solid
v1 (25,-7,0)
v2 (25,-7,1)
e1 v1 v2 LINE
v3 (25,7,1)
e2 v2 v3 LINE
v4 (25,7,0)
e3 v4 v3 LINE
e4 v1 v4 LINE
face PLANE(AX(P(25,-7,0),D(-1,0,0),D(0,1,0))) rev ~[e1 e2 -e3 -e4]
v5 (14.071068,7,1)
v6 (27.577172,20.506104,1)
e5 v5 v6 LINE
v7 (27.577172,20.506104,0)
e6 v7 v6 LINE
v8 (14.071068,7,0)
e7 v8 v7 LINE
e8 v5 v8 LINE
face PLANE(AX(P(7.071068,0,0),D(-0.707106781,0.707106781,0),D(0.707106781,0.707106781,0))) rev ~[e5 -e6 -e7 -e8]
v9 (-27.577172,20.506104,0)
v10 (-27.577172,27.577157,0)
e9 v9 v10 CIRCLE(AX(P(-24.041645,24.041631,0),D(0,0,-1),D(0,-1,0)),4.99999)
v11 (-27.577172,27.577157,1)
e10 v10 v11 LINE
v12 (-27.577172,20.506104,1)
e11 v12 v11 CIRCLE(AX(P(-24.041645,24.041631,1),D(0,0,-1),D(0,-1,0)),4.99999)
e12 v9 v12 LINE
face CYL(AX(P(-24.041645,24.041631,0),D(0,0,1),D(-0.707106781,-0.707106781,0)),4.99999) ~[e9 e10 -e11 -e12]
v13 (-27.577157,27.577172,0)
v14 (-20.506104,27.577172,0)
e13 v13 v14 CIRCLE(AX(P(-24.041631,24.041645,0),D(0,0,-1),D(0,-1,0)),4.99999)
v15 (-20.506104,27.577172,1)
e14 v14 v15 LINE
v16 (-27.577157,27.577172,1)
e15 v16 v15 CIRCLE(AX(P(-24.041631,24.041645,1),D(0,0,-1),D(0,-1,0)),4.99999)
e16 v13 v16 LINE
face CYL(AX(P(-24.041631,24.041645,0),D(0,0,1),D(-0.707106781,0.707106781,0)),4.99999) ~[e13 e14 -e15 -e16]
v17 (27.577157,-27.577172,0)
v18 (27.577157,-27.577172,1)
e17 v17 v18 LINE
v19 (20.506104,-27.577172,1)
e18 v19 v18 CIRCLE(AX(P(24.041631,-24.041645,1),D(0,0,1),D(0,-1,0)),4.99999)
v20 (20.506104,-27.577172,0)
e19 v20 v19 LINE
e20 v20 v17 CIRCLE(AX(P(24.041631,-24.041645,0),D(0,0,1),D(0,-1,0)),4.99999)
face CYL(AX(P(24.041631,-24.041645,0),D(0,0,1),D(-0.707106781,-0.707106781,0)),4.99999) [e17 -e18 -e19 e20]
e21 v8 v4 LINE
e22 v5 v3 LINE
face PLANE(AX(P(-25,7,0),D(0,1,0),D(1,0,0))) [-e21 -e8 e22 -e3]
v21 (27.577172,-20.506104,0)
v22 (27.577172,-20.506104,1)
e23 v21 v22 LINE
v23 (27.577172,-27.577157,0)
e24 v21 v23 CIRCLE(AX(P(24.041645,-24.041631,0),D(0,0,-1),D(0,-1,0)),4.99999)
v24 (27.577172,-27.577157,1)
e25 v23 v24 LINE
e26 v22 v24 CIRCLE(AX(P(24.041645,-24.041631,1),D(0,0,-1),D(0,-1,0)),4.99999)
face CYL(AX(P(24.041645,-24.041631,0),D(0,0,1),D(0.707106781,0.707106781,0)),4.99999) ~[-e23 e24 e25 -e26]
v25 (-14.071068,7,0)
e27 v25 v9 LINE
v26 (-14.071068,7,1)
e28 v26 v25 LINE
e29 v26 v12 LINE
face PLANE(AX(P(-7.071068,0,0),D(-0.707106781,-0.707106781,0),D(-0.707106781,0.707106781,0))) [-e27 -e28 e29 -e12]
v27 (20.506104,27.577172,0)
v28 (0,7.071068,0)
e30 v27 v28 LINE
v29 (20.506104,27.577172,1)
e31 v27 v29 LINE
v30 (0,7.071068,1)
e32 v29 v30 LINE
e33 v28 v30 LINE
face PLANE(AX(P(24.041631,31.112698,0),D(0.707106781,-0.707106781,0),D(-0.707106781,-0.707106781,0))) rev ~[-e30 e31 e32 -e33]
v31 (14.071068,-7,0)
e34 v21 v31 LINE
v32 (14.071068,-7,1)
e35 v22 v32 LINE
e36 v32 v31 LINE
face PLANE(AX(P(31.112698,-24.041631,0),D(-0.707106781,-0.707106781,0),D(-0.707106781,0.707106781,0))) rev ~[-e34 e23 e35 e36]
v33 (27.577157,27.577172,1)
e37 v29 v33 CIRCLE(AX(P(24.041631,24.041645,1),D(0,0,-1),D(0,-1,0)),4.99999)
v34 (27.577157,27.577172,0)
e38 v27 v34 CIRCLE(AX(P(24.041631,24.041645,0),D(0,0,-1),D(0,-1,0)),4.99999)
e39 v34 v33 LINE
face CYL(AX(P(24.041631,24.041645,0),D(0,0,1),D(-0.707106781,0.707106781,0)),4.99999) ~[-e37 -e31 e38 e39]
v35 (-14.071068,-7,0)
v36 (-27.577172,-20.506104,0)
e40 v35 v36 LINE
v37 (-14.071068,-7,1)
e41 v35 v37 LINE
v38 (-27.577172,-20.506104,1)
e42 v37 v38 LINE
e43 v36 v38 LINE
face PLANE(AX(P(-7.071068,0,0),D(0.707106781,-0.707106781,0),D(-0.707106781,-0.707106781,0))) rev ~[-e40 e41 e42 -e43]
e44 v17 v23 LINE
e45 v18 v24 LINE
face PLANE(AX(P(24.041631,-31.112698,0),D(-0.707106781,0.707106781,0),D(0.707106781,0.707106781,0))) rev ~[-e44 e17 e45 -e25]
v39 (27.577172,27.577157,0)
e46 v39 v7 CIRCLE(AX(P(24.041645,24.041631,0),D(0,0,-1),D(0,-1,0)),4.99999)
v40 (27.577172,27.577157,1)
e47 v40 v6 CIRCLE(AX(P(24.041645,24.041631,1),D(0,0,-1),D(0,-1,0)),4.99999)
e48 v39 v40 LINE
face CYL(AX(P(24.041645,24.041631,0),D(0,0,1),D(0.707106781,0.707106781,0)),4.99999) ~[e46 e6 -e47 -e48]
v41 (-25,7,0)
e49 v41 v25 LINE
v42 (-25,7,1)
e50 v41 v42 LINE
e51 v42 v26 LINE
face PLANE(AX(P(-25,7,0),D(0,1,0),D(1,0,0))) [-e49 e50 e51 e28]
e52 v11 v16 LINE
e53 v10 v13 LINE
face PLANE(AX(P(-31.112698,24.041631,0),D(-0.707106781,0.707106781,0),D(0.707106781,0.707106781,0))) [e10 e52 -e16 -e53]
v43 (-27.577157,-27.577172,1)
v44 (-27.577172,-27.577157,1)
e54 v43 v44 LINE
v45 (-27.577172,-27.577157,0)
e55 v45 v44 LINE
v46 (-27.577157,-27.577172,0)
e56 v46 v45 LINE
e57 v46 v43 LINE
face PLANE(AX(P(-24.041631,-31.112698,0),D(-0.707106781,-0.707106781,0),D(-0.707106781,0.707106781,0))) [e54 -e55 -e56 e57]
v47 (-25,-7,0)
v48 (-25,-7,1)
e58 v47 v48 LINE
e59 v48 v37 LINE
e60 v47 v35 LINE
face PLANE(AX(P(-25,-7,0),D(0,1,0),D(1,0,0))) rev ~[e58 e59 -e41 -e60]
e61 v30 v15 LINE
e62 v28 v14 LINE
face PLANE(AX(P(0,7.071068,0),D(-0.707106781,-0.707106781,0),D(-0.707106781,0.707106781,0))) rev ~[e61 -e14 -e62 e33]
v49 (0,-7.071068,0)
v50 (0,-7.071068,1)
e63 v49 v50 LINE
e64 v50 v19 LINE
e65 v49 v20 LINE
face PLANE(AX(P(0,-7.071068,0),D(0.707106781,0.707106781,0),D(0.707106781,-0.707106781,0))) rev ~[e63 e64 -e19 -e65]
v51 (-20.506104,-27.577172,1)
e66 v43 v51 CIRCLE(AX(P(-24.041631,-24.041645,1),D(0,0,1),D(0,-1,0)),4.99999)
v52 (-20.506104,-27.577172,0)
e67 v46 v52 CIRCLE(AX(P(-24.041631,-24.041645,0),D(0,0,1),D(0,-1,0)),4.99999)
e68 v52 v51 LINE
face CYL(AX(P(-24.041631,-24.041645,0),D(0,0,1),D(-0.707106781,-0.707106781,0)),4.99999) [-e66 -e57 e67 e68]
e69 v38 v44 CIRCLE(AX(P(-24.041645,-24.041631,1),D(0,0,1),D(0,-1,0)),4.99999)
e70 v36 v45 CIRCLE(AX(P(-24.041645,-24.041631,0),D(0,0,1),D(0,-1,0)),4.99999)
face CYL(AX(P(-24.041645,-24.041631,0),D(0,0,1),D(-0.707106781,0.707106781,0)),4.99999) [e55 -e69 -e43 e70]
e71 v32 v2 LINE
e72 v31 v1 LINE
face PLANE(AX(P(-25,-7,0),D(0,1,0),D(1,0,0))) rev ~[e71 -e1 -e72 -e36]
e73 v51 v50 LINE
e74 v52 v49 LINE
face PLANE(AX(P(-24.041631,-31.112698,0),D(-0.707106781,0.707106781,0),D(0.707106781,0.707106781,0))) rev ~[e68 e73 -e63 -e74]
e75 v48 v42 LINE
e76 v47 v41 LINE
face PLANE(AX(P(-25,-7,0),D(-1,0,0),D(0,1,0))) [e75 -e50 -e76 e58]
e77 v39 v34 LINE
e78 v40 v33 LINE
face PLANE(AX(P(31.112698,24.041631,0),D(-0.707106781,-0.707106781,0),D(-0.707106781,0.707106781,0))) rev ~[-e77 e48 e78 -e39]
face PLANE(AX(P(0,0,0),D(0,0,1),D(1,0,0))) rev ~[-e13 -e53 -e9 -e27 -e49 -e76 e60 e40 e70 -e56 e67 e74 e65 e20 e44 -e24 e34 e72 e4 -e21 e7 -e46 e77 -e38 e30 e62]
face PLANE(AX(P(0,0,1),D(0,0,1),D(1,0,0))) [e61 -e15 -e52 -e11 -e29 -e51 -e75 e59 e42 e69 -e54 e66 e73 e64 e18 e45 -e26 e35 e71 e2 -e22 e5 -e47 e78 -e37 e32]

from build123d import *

# Parameters (mm, degrees)
F1_W     = 10
F1_H     = 34
F1_H_2   = 10
F1_W_2   = 34
F2_DEPTH = 1
F3_ANGLE = 45
F4_W     = 50
F4_H     = 14
F5_DEPTH = 1
F6_R     = 4.99999


# Not quite as in the source:
# - a fillet or chamfer is up to 0.001 mm smaller than in the source, because OpenCascade refuses the exact size


with BuildPart() as f2:
    # F1 (on Top) → F2 (new body)
    with BuildSketch(Plane.XY):
        with Locations((0, -22)):
            Rectangle(F1_W, F1_H)
        Rectangle(F1_W, F1_H_2)
        with Locations((22, 0)):
            Rectangle(F1_W_2, F1_H_2)
        with Locations((-22, 0)):
            Rectangle(F1_W_2, F1_H_2)
        with Locations((0, 22)):
            Rectangle(F1_W, F1_H)
    extrude(amount=F2_DEPTH)


with BuildPart() as f2_1:
    # F3: moved
    add(f2.part.rotate(Axis((0, 0, 15.9228555858), (0, 0, 1)), F3_ANGLE))

    # F4 (on Top) → F5 (join)
    with BuildSketch(Plane.XY):
        Rectangle(F4_W, F4_H)
    extrude(amount=F5_DEPTH)

    # F6 (radius 5 in the source; OpenCascade refuses exactly that, so slightly less here)
    f6_edges = [f2_1.edges().sort_by_distance(p)[0] for p in [
        (-31.112698, 24.041631, 0.5),
        (-31.112698, -24.041631, 0.5),
        (-24.041631, -31.112698, 0.5),
        (24.041631, -31.112698, 0.5),
        (31.112698, 24.041631, 0.5),
        (31.112698, -24.041631, 0.5),
        (24.041631, 31.112698, 0.5),
        (-24.041631, 31.112698, 0.5),
    ]]
    fillet(f6_edges, radius=F6_R)


solid = f2_1.part
